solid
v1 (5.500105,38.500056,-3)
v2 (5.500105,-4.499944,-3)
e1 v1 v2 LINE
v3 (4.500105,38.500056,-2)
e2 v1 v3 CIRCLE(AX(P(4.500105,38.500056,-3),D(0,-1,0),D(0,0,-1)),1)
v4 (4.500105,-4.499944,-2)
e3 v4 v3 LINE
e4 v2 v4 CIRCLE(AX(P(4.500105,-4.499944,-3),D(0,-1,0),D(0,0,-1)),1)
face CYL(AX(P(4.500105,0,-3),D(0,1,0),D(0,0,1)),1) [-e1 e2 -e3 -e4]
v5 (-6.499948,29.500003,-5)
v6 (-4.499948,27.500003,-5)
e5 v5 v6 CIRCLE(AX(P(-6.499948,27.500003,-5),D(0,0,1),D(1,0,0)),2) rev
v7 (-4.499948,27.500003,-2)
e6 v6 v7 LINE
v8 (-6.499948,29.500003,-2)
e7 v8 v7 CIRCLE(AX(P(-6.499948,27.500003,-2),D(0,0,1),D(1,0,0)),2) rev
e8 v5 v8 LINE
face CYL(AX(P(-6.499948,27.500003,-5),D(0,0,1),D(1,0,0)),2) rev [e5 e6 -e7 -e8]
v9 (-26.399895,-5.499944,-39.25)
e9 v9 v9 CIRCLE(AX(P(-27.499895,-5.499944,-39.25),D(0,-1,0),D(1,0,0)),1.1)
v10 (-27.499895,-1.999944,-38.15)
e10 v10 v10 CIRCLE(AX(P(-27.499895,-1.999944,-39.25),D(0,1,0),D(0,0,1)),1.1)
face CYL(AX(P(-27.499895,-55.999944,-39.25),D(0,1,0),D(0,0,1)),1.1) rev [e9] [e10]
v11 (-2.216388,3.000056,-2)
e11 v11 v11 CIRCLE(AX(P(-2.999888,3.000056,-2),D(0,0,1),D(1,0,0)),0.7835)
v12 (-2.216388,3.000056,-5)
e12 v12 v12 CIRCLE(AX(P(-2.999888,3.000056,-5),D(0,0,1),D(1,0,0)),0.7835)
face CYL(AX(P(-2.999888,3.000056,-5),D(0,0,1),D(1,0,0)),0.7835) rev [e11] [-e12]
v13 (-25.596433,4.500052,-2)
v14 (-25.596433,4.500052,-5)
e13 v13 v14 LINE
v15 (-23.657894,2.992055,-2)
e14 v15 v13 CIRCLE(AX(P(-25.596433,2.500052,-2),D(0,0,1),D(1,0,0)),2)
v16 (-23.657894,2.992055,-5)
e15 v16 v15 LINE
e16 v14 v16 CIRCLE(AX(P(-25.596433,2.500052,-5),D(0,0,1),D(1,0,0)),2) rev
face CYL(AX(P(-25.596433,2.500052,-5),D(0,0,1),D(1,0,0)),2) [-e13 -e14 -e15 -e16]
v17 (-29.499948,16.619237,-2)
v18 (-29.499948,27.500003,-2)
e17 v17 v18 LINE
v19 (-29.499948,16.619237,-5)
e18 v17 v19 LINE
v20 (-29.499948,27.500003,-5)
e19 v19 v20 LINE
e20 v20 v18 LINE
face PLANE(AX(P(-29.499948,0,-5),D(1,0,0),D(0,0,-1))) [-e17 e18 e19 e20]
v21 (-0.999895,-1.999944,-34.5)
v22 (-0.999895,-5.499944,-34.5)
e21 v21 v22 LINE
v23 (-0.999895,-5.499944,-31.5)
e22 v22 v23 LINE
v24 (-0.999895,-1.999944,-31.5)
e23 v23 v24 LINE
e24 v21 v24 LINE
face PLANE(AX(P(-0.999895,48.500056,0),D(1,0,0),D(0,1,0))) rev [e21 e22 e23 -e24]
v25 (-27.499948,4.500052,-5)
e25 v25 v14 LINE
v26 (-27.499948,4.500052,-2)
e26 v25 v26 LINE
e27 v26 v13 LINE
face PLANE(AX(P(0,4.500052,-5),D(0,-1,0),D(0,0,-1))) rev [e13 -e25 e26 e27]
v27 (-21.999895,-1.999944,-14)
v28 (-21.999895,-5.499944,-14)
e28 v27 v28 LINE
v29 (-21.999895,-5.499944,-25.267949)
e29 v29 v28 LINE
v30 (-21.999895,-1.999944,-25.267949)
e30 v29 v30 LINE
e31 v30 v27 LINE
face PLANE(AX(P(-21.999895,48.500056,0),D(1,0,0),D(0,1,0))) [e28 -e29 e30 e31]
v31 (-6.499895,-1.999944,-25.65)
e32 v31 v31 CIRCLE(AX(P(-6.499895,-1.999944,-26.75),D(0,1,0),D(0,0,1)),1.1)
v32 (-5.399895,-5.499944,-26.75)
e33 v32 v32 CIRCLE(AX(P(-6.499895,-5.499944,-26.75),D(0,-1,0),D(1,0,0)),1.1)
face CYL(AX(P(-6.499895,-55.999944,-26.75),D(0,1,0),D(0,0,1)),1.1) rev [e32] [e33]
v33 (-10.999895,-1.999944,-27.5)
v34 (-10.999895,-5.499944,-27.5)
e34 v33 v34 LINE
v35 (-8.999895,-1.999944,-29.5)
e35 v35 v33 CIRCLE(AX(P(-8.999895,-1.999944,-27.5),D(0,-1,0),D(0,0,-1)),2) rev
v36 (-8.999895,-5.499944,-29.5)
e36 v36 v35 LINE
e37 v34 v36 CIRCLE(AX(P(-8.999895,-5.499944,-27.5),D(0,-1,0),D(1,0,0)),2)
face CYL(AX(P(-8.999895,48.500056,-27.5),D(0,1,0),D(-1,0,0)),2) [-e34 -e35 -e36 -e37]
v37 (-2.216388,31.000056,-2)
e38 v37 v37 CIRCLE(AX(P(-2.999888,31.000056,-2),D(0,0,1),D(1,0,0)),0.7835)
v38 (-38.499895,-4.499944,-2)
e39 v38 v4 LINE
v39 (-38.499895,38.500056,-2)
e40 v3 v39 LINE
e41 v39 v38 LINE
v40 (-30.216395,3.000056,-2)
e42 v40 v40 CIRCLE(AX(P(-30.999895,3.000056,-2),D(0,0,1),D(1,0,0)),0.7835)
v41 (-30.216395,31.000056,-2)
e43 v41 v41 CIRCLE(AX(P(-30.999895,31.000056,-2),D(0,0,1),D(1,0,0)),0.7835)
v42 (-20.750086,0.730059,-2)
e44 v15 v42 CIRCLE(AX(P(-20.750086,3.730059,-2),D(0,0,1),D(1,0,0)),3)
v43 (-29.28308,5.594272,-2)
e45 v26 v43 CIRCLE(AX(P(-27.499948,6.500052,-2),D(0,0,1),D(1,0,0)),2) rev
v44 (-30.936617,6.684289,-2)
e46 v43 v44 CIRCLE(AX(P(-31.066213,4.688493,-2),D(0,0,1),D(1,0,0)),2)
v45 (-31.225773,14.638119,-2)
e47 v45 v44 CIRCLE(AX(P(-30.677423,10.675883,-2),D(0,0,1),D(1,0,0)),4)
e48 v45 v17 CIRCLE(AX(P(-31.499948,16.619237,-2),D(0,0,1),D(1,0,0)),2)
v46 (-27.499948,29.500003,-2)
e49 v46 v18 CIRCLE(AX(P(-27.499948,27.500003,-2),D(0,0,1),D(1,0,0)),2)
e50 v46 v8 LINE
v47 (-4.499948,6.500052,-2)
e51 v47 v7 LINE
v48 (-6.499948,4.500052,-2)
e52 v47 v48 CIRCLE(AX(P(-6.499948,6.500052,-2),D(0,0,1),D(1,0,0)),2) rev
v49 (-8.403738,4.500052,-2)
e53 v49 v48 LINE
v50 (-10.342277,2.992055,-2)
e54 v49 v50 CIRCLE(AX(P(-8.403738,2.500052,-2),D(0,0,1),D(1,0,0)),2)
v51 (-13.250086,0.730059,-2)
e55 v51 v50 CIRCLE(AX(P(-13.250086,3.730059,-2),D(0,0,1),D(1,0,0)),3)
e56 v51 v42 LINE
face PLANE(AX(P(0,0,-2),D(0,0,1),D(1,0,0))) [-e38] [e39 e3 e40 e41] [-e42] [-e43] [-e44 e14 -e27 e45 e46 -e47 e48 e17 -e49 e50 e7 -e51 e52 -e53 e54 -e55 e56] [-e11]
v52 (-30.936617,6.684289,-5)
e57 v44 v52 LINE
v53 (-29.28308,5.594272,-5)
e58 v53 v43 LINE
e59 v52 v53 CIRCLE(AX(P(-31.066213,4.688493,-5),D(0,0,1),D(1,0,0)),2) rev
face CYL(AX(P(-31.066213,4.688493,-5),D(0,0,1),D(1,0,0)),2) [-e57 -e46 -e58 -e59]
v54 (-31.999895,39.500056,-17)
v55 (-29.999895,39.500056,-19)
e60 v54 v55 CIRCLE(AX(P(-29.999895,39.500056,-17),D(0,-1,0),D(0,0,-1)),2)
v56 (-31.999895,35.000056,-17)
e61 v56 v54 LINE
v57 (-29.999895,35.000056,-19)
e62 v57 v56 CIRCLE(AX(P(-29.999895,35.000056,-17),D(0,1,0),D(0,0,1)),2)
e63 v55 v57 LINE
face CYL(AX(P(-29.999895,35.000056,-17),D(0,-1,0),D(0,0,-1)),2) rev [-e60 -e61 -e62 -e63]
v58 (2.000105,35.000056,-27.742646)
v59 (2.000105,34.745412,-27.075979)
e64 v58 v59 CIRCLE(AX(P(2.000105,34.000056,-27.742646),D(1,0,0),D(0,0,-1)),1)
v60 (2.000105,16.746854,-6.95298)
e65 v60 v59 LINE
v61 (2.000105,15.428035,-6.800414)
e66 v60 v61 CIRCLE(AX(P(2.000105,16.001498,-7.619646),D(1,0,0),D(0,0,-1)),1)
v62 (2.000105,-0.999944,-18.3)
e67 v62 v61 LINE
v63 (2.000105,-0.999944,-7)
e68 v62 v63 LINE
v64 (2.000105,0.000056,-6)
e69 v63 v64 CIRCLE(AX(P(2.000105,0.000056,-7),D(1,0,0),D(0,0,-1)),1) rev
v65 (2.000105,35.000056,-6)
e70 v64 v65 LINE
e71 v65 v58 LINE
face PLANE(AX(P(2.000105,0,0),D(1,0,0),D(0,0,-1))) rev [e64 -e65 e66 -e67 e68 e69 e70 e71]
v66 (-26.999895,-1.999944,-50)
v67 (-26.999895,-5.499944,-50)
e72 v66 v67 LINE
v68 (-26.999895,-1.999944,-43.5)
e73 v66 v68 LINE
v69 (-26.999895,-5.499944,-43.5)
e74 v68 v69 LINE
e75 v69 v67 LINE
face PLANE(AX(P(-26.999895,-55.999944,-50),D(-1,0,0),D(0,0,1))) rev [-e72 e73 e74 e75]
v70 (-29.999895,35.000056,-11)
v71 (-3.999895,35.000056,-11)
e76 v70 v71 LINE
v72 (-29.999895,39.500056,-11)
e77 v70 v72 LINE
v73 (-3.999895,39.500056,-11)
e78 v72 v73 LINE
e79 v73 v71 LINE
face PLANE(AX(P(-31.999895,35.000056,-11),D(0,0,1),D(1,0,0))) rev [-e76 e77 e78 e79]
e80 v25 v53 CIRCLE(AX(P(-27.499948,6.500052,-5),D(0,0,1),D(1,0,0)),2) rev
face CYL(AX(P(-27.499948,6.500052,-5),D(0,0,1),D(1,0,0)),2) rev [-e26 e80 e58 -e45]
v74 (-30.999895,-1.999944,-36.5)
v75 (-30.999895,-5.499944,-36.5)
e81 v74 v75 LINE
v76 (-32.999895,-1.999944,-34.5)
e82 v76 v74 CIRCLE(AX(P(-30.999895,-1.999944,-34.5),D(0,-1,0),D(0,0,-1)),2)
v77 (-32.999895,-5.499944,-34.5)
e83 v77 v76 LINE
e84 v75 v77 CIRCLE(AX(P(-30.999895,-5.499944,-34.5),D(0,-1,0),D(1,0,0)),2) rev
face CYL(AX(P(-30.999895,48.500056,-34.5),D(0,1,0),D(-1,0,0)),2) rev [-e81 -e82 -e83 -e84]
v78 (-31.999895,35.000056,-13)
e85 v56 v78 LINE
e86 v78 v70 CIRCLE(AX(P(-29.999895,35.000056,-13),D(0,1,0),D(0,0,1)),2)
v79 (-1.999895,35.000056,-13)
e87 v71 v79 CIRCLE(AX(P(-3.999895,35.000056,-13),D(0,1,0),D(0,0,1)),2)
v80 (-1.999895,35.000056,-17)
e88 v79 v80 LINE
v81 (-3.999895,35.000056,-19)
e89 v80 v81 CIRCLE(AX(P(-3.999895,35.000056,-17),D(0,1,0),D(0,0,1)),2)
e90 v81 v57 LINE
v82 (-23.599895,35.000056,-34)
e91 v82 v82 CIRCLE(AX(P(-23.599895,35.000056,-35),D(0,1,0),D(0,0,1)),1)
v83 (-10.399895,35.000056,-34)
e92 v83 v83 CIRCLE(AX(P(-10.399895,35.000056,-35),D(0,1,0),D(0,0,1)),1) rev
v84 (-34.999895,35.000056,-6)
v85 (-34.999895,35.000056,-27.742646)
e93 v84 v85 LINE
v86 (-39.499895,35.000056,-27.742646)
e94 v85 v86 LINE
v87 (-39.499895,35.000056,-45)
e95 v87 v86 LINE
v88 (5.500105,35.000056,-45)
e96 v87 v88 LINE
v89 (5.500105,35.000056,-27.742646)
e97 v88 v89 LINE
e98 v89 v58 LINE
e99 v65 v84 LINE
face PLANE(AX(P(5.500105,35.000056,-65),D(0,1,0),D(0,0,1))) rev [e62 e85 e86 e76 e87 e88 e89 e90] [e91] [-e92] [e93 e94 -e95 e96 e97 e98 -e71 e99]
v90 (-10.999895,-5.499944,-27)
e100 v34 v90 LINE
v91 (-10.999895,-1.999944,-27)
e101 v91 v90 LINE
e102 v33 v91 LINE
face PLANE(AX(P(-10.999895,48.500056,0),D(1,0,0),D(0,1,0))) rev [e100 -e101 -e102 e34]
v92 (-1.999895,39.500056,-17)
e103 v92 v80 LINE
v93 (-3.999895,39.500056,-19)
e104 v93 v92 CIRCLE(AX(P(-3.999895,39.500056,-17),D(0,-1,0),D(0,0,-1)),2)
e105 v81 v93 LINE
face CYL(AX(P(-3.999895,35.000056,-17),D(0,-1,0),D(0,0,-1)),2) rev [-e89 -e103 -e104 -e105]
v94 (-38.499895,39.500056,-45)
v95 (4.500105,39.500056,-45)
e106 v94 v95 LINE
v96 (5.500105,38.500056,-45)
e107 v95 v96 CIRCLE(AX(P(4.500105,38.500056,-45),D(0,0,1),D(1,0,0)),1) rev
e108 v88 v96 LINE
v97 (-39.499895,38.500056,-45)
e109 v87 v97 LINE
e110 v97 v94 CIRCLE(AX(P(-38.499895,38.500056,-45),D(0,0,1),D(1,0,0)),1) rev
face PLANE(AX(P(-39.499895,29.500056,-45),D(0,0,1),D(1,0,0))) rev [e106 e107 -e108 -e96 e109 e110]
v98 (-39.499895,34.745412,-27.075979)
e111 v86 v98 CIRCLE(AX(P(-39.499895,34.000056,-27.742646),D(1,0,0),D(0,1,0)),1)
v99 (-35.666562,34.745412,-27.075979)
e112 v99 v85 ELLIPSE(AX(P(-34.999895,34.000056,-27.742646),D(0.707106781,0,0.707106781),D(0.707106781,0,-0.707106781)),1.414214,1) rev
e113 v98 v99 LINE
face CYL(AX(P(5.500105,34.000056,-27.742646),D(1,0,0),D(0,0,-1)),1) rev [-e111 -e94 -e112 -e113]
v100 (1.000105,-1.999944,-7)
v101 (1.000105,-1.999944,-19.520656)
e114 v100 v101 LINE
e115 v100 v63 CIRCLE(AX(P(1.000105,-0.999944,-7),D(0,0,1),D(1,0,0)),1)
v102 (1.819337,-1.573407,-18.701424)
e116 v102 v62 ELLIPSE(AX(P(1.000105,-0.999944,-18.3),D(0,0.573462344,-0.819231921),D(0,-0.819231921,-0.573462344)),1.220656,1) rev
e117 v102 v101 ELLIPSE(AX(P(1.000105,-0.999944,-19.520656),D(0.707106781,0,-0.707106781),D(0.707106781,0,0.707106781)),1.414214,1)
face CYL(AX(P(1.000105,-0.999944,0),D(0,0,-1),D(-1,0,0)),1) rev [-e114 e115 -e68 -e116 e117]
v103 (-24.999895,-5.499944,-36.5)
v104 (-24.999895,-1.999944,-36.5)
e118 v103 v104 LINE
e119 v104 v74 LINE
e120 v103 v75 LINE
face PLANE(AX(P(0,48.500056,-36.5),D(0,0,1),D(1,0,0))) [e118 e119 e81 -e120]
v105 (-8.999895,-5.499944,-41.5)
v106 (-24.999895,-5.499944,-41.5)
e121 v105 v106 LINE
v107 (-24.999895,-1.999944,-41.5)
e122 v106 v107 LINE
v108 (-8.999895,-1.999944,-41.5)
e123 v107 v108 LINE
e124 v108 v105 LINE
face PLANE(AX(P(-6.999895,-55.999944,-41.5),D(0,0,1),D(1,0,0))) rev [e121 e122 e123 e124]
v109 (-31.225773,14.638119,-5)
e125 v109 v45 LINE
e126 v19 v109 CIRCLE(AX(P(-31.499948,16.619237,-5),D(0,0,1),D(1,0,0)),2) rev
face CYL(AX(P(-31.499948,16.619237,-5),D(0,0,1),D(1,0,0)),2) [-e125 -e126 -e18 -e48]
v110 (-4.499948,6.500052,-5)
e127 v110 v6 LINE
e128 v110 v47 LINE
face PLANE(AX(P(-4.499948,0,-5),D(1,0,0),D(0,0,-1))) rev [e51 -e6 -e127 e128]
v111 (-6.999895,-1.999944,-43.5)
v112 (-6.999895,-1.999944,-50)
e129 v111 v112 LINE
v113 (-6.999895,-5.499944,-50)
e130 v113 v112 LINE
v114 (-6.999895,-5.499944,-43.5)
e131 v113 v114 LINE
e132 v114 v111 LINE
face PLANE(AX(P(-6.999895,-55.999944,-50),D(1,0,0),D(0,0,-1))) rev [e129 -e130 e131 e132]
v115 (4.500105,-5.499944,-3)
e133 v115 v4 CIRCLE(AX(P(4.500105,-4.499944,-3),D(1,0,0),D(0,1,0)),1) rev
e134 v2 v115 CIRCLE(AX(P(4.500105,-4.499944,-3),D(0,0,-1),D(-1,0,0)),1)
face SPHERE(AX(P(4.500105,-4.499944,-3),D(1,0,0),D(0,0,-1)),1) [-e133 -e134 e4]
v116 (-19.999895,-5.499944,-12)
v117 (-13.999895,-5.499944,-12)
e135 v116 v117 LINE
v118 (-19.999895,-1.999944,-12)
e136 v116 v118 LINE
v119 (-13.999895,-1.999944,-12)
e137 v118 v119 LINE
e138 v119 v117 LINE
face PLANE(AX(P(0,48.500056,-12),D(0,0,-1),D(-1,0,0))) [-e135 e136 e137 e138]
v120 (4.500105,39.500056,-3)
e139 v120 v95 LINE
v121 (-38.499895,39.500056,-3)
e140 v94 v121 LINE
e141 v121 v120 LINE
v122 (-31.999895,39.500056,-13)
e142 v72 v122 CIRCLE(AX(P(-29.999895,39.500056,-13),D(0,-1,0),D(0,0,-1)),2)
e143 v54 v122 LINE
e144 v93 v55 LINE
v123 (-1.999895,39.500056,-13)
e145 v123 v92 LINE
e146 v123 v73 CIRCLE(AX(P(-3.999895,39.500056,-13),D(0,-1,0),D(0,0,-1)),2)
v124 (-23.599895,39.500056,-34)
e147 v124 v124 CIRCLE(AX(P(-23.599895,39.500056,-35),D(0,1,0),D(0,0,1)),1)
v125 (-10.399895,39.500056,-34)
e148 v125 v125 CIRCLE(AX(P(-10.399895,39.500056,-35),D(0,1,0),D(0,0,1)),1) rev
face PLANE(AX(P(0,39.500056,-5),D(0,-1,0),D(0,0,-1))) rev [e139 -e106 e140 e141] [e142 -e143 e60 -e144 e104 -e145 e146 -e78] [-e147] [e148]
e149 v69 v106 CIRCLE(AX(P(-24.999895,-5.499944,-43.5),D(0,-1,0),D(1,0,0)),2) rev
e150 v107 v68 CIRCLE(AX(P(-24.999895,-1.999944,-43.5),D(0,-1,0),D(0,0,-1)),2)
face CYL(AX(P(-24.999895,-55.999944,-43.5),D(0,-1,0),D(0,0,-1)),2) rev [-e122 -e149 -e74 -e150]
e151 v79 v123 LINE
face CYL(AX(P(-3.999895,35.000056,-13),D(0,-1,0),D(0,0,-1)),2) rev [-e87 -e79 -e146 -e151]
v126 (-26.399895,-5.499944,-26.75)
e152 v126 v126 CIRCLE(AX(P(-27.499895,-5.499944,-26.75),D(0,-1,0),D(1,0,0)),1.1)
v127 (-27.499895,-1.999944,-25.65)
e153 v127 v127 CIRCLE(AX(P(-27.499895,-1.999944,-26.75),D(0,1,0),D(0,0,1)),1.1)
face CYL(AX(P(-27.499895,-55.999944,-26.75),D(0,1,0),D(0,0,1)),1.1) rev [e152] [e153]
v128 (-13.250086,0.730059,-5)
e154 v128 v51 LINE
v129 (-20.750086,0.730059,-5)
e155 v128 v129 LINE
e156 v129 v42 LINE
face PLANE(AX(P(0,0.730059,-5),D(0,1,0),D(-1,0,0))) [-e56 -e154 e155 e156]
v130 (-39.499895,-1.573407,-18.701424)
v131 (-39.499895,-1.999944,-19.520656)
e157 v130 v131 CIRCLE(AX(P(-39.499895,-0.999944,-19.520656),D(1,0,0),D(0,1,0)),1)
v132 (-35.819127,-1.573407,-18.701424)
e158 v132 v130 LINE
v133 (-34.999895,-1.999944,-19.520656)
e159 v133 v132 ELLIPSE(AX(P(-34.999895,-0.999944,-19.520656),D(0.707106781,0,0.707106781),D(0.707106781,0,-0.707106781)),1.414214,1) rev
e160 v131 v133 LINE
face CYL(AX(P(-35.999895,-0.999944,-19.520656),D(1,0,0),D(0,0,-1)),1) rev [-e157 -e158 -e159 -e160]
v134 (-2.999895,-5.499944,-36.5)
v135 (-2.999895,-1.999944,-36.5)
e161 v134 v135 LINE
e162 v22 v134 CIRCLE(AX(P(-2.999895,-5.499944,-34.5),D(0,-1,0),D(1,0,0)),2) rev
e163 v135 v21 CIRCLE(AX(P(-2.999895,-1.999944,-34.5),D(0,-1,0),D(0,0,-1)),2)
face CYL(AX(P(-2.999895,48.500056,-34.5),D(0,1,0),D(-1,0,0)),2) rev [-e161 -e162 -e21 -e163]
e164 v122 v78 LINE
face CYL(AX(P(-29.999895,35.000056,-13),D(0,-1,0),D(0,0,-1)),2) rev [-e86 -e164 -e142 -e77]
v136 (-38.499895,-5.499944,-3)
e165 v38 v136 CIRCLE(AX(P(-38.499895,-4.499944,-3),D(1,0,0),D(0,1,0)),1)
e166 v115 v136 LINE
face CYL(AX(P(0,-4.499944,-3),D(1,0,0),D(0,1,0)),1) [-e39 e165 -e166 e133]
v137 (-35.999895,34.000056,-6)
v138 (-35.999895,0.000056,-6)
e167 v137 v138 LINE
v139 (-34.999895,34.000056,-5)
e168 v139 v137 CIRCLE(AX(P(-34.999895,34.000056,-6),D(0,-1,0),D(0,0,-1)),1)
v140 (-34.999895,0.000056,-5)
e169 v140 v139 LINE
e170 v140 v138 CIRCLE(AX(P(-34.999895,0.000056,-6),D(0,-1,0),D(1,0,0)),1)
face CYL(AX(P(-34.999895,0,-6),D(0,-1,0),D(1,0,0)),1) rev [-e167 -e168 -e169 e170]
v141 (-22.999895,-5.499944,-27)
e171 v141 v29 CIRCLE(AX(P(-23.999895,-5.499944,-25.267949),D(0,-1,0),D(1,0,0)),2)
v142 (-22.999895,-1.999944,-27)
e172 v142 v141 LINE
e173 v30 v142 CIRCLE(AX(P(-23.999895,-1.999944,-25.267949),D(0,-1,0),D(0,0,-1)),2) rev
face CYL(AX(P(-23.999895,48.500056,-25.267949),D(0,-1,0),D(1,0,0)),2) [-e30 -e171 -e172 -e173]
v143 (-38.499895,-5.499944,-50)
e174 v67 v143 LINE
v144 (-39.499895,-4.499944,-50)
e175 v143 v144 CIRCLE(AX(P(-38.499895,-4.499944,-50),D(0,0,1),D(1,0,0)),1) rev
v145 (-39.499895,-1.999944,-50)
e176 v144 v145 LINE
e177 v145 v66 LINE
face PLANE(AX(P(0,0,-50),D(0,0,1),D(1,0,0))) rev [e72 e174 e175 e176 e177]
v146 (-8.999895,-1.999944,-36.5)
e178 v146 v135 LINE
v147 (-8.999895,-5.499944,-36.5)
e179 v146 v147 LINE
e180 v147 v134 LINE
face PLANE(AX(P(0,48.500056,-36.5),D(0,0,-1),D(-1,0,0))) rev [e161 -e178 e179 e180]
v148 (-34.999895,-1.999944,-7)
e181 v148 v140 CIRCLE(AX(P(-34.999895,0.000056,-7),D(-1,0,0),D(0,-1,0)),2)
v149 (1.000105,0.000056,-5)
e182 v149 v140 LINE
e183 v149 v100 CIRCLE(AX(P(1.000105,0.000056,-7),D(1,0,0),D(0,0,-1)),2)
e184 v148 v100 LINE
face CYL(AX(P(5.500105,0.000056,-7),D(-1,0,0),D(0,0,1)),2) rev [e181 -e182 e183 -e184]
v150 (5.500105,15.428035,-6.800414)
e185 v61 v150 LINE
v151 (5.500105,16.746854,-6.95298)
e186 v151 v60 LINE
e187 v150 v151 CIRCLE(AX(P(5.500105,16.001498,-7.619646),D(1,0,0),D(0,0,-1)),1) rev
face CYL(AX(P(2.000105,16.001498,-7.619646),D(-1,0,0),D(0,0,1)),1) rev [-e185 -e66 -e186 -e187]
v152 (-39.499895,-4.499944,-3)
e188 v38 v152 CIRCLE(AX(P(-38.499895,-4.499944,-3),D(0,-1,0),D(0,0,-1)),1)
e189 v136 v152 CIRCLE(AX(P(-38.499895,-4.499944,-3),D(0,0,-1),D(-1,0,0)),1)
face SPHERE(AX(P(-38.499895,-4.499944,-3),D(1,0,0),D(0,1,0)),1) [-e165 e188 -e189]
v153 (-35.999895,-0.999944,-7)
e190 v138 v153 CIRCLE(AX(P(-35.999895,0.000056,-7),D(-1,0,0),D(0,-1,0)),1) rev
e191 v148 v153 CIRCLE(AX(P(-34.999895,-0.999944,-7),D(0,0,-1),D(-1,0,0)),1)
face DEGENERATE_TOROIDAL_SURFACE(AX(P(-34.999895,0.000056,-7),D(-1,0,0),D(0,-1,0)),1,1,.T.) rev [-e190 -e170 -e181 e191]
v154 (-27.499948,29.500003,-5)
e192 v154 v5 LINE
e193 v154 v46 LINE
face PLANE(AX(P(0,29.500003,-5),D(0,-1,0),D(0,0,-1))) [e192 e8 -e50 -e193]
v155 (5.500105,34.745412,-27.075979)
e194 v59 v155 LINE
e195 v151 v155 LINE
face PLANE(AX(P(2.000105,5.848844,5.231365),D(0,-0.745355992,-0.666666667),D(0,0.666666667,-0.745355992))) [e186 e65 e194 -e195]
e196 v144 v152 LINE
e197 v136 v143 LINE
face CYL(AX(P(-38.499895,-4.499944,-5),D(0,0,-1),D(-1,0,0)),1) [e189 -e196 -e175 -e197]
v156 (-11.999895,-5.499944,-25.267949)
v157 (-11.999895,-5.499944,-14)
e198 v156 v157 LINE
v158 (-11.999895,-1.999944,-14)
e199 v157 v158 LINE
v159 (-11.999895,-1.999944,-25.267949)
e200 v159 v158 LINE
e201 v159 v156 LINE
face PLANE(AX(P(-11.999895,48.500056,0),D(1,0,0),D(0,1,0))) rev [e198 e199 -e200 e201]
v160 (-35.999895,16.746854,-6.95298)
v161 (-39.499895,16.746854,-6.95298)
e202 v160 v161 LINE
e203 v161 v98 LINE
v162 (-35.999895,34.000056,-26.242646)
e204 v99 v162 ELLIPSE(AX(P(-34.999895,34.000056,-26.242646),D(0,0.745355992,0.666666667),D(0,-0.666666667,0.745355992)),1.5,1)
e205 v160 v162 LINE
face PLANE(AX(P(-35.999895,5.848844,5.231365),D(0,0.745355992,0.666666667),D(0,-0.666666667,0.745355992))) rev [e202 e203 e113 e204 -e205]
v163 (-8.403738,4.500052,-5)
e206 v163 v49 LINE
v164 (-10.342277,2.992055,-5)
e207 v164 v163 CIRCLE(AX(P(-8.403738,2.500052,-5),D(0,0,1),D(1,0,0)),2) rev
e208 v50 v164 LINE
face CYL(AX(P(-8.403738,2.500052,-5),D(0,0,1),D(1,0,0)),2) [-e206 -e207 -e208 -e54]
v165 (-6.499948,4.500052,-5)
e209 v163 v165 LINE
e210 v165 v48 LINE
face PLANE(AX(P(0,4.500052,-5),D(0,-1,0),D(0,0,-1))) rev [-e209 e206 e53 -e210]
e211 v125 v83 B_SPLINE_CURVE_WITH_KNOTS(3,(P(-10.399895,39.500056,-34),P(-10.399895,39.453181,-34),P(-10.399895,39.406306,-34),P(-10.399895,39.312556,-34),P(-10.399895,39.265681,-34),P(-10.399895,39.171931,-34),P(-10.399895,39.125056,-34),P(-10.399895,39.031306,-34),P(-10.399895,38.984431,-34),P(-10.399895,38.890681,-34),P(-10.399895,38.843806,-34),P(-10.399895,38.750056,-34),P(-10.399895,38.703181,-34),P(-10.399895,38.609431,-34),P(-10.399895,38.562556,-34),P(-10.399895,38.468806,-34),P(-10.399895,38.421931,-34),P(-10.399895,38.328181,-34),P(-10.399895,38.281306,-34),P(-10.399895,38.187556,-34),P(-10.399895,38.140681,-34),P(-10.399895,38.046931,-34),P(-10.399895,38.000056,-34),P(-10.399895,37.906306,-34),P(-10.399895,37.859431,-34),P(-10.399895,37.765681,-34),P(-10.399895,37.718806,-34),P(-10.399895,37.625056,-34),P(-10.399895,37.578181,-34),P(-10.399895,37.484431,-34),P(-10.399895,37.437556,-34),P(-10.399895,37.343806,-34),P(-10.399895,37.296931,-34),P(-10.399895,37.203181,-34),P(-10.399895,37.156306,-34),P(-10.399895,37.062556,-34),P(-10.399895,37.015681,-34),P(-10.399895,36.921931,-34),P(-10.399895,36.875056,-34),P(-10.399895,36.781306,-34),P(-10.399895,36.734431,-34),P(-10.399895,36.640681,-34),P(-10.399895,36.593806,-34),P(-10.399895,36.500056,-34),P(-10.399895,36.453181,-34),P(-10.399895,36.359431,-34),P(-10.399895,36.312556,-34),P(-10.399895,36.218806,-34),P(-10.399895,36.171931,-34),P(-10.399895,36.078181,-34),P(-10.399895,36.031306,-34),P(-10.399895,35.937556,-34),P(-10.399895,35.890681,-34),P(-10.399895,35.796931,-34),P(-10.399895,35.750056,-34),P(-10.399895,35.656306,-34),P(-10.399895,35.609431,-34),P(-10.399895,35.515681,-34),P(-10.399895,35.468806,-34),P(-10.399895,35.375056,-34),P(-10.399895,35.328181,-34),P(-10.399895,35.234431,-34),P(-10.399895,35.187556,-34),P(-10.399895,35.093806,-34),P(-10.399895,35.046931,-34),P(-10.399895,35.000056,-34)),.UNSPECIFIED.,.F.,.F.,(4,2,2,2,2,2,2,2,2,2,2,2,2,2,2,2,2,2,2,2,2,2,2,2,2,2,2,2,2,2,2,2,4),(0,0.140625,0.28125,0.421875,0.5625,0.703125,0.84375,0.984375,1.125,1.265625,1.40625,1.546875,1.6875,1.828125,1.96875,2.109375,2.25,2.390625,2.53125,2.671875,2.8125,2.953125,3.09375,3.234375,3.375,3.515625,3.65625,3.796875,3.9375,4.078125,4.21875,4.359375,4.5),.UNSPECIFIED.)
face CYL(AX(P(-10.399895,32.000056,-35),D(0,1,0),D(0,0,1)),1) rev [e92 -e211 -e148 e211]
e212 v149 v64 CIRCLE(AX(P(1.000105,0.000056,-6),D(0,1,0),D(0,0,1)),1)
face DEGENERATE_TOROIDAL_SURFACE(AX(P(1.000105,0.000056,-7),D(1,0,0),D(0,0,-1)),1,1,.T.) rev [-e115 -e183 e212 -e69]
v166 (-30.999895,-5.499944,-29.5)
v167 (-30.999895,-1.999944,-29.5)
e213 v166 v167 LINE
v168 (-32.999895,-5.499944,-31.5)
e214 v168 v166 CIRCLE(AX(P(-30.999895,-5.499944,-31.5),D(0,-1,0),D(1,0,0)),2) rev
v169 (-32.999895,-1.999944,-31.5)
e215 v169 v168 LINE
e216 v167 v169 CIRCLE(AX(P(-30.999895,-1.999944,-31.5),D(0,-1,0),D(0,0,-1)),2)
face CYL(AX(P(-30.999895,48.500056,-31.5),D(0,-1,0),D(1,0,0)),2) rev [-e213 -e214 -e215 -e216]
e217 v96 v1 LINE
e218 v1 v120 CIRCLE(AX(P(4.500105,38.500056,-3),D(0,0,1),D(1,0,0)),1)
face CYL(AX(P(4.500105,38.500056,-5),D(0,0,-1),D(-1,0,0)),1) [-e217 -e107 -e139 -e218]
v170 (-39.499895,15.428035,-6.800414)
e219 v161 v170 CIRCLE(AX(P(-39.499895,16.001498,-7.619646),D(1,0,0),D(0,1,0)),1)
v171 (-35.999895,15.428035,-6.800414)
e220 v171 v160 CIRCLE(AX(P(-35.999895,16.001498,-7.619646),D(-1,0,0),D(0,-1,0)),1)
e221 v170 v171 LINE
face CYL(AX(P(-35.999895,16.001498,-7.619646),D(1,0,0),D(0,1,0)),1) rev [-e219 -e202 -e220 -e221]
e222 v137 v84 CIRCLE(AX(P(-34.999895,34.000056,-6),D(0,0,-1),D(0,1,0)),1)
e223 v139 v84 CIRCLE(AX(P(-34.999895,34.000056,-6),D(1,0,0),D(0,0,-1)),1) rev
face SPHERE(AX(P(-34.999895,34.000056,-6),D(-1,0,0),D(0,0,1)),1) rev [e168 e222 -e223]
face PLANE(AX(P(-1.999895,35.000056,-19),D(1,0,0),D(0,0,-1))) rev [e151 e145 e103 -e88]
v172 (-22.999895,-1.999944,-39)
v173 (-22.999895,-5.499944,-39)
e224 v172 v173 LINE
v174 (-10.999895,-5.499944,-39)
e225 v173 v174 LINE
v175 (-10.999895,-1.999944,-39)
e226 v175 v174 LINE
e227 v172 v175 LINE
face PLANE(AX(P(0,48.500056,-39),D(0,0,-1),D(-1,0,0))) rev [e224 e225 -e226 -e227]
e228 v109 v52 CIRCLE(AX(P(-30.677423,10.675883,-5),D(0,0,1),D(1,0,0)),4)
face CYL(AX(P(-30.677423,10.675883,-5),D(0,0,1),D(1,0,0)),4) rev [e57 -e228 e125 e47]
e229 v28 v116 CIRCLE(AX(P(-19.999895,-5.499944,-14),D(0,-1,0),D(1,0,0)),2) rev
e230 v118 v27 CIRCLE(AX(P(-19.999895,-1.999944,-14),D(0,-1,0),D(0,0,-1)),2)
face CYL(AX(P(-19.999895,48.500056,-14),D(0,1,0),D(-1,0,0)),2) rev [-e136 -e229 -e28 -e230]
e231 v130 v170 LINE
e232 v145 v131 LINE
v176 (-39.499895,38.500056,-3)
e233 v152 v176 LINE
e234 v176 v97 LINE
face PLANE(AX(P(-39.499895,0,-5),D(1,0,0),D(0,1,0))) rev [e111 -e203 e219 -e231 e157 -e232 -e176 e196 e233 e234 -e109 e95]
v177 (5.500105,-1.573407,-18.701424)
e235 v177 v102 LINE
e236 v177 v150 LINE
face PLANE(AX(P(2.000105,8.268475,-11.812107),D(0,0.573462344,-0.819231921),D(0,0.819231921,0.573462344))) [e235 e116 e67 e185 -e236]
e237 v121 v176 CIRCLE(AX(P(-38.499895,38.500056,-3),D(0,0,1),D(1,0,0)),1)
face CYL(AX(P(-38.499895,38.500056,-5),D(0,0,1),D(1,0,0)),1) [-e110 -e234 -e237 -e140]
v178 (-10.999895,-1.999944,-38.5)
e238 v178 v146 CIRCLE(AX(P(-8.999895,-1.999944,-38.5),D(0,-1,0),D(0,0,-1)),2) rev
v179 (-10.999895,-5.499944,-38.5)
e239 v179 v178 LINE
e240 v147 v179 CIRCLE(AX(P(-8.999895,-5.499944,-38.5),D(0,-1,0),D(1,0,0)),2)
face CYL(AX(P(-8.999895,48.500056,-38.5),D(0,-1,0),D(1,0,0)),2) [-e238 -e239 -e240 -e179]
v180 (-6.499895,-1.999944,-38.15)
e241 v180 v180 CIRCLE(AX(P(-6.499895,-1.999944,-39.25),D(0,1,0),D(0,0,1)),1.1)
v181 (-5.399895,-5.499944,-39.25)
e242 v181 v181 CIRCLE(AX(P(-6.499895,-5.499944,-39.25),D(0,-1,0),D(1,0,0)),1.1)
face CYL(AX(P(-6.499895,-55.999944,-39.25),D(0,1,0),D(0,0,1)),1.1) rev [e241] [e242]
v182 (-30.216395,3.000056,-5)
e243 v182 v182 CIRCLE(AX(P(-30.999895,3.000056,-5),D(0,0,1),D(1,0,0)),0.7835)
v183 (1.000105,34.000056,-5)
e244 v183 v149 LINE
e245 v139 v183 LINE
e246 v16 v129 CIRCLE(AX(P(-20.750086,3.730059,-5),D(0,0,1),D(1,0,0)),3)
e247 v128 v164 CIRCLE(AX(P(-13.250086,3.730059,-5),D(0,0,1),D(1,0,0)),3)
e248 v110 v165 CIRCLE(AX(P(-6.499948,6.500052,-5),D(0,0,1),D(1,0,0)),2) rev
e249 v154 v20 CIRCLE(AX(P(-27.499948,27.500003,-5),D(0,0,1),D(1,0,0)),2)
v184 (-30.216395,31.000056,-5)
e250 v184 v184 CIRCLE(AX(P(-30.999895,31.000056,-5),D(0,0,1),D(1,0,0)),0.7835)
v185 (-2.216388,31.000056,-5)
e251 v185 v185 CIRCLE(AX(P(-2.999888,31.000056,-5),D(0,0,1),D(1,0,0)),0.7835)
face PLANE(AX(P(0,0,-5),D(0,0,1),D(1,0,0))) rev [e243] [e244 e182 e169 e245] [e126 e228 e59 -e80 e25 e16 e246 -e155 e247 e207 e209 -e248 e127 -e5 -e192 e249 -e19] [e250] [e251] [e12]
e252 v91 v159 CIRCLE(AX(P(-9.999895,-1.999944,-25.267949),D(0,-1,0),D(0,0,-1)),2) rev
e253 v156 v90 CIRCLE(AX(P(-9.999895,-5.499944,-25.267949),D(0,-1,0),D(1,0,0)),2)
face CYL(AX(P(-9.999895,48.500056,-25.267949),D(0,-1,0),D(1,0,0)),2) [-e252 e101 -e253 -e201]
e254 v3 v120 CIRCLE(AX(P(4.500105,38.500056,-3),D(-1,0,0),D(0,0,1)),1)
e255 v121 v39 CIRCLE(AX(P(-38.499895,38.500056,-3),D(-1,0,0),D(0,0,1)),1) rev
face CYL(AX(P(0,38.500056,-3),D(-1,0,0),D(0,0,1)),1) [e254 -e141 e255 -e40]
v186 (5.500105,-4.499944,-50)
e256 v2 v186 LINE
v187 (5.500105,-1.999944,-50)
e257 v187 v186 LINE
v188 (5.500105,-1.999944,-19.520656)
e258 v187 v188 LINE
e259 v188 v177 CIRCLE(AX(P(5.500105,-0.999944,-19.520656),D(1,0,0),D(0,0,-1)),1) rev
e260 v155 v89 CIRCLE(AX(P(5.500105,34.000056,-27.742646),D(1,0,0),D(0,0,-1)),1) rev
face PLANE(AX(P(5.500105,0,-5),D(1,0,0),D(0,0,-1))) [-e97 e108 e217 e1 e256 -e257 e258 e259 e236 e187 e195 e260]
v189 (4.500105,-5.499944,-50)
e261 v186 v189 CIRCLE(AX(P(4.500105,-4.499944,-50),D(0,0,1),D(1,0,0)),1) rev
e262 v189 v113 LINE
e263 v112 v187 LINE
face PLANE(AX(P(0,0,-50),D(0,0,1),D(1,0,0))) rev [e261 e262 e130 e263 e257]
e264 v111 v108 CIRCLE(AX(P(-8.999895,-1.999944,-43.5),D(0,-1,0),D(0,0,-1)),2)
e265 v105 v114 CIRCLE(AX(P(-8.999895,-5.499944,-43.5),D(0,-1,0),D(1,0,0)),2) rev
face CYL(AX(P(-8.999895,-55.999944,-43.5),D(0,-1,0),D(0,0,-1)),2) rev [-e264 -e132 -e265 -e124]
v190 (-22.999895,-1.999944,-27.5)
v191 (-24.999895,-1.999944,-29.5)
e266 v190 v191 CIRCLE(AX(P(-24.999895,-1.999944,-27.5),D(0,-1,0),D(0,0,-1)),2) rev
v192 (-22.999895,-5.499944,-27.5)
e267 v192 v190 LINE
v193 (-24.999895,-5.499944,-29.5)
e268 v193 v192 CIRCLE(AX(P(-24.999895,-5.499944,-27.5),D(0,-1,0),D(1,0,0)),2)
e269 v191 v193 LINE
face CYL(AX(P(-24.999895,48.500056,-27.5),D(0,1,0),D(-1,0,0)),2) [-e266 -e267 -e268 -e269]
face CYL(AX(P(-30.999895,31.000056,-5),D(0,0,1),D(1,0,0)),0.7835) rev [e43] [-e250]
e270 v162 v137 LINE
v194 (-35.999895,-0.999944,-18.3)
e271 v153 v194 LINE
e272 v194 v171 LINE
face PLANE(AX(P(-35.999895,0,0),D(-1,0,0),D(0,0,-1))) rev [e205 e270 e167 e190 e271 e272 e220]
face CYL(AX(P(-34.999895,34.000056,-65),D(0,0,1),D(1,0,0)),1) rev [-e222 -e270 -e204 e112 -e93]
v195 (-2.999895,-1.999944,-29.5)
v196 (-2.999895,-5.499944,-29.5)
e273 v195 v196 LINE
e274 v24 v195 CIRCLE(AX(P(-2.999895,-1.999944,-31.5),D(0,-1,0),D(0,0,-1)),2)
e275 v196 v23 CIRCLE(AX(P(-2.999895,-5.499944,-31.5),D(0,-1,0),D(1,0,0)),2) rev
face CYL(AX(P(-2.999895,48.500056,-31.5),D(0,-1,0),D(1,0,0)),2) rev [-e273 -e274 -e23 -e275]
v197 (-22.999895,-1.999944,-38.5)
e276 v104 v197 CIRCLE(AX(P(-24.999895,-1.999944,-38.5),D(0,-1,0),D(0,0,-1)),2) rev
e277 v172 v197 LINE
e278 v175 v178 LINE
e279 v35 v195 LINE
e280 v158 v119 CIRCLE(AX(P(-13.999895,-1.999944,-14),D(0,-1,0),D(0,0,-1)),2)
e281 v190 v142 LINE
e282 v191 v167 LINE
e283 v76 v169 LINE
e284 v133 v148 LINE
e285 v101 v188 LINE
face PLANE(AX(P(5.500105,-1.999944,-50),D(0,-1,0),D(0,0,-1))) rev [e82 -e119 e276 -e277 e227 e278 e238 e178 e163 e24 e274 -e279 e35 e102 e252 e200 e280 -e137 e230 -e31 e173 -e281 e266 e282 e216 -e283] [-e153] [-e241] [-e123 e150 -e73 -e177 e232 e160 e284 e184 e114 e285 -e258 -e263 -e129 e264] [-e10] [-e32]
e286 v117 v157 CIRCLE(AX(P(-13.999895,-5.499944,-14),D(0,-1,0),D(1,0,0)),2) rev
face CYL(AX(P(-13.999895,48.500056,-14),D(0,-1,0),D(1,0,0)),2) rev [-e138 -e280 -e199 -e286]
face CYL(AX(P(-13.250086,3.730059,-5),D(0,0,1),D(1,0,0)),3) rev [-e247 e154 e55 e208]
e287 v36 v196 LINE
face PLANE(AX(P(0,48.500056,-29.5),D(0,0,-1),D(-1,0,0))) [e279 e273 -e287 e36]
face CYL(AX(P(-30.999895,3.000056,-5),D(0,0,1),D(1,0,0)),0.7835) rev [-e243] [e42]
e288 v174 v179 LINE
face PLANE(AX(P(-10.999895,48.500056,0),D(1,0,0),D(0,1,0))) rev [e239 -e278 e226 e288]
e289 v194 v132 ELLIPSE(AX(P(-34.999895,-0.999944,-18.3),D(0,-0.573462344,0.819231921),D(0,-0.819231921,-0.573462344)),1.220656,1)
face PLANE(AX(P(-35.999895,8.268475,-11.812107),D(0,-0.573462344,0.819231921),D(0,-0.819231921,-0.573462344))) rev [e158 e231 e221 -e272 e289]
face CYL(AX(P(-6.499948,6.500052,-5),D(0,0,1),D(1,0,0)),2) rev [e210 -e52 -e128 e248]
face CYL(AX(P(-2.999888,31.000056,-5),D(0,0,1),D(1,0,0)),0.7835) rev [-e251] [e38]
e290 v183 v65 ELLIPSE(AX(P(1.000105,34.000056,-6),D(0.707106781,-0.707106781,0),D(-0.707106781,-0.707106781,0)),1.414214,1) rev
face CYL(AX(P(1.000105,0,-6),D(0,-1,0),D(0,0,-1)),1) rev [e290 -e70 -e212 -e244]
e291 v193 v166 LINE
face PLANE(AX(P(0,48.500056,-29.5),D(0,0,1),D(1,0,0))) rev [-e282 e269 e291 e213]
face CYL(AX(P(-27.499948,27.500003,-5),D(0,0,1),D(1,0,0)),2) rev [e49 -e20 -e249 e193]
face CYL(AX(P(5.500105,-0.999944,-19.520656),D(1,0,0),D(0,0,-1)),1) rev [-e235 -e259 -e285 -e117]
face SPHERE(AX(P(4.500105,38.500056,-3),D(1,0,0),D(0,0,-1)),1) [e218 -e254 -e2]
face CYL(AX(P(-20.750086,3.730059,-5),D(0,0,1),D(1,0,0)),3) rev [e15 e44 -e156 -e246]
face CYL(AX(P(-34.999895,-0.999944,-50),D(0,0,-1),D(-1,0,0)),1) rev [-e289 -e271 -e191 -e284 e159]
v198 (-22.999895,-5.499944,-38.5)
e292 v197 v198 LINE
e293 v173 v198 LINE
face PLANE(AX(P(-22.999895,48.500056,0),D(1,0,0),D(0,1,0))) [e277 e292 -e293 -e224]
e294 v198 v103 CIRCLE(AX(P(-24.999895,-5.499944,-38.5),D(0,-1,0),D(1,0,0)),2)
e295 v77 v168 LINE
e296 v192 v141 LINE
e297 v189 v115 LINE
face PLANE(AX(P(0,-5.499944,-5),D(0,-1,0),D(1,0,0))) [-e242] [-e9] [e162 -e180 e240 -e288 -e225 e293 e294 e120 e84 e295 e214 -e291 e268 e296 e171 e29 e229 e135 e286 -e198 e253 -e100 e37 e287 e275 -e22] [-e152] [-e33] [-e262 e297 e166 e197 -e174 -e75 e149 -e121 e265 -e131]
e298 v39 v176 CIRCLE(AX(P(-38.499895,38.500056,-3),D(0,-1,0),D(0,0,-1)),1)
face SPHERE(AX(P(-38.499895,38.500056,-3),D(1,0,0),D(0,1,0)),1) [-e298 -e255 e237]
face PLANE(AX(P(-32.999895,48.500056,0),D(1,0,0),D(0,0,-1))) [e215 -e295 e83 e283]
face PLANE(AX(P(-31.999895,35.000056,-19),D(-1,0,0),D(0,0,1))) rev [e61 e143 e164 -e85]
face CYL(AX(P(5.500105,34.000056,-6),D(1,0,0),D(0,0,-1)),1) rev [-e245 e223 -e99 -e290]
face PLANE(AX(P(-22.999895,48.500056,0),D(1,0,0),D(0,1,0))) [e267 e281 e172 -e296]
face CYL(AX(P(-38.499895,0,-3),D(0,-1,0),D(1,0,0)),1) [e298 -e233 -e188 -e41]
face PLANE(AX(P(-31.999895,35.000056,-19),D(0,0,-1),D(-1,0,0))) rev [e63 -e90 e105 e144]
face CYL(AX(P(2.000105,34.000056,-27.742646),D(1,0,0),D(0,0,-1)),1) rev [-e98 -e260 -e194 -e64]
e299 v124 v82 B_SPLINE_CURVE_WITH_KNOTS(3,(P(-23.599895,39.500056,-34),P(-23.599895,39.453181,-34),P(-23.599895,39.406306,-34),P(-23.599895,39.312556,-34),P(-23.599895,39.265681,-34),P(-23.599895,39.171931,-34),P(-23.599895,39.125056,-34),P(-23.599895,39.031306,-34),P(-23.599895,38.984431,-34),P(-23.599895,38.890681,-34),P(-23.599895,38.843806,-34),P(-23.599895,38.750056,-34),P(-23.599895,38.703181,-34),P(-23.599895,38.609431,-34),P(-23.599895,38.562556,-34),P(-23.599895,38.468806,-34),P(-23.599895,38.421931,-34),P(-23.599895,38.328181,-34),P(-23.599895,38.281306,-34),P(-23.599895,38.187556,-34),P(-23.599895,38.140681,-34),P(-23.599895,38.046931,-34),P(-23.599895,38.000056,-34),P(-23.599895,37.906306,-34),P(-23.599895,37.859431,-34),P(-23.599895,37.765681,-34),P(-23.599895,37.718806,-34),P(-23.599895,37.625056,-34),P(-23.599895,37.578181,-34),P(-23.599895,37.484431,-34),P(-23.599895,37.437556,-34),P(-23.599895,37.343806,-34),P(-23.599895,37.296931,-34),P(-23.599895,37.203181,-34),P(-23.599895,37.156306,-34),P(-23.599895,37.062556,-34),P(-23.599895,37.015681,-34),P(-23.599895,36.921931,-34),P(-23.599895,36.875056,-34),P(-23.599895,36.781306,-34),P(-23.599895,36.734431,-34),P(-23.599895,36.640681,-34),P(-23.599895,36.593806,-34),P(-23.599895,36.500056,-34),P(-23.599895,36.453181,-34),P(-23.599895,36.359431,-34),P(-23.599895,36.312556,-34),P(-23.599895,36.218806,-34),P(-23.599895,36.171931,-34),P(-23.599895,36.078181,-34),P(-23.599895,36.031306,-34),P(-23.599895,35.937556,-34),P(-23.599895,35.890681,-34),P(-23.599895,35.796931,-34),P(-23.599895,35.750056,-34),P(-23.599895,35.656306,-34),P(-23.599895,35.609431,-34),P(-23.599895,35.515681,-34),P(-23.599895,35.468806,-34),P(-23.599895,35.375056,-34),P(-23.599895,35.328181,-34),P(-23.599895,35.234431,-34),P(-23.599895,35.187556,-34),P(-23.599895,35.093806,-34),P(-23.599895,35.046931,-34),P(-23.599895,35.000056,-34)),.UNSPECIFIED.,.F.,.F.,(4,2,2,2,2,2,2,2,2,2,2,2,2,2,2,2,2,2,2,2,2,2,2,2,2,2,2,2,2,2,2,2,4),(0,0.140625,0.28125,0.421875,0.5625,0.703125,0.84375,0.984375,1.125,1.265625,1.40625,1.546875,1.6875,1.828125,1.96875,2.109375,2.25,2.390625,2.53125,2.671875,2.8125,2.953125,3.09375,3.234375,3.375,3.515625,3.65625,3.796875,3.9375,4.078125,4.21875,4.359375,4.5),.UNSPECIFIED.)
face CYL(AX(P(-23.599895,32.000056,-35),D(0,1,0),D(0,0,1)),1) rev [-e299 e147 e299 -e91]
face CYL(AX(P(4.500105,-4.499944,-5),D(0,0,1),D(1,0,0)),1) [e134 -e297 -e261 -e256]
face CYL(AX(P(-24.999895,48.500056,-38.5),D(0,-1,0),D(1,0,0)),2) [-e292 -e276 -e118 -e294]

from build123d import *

# Parameters (mm, degrees)
BOSS_EXTRUDE1_START     = -5
BOSS_EXTRUDE1_OUTLINE_W = 45
BOSS_EXTRUDE1_OUTLINE_H = 45
BOSS_EXTRUDE1_OUTLINE_R = 0.7835
BOSS_EXTRUDE1_DEPTH     = 3
FILLET1_R               = 2
SKETCH2_W               = 45
SKETCH2_H               = 3.5
BOSS_EXTRUDE2_DEPTH     = 45
SKETCH3_R               = 1.1
CUT_EXTRUDE1_DEPTH      = 54
SKETCH4_W               = 20
SKETCH4_H               = 8.5
CUT_EXTRUDE2_DEPTH      = 54
FILLET2_R               = 2
SKETCH5_W               = 4.5
SKETCH5_H               = 7
SKETCH5_W_2             = 5.5
SKETCH5_W_3             = 10
SKETCH5_H_2             = 15
CUT_EXTRUDE3_DEPTH      = 54
FILLET3_R               = 2
FILLET4_R               = 2
SKETCH6_W               = 45
SKETCH6_H               = 4.5
BOSS_EXTRUDE3_DEPTH     = 60
FILLET5_R               = 1
FILLET6_R               = 1
BOSS_EXTRUDE4_DEPTH     = 3.5
FILLET7_R               = 1
SKETCH8_R               = 1
CUT_EXTRUDE4_DEPTH      = 7.5
FILLET8_R               = 1
SKETCH9_W               = 45
SKETCH9_H               = 20
CUT_EXTRUDE5_DEPTH      = 10
SKETCH11_W              = 30
SKETCH11_H              = 8
CUT_EXTRUDE6_DEPTH      = 4.5
FILLET12_R              = 2


with BuildPart() as part:
    # Boss-Extrude1: read off the stored shape, not the designer's step
    # Boss-Extrude1 outline → Boss-Extrude1 (new body)
    with BuildSketch(Plane.XY.offset(BOSS_EXTRUDE1_START)):
        with Locations((-16.999895153, 17.00005562)):
            Rectangle(BOSS_EXTRUDE1_OUTLINE_W, BOSS_EXTRUDE1_OUTLINE_H)
        with Locations((-30.999895153, 3.00005562)):
            Circle(BOSS_EXTRUDE1_OUTLINE_R, mode=Mode.SUBTRACT)
        with BuildLine():
            ThreePointArc((-29.499947577, 6.853115409), (-34.677423456, 10.675882804), (-29.499947577, 14.498650198))
            Line((-29.499947577, 14.498650198), (-29.499947577, 27.500003196))
            ThreePointArc((-29.499947577, 27.500003196), (-28.914161139, 28.914216759), (-27.499947577, 29.500003196))
            Line((-27.499947577, 29.500003196), (-6.499947577, 29.500003196))
            ThreePointArc((-6.499947577, 29.500003196), (-5.085734014, 28.914216759), (-4.499947577, 27.500003196))
            Line((-4.499947577, 27.500003196), (-4.499947577, 6.500052423))
            ThreePointArc((-4.499947577, 6.500052423), (-5.085734015, 5.08583886), (-6.499947577, 4.500052423))
            Line((-6.499947577, 4.500052423), (-10.35058429, 4.500052423))
            ThreePointArc((-10.35058429, 4.500052423), (-10.872063447, 1.901121953), (-13.250085888, 0.730058603))
            Line((-13.250085888, 0.730058603), (-20.750085888, 0.730058603))
            ThreePointArc((-20.750085888, 0.730058603), (-23.128108329, 1.901121953), (-23.649587486, 4.500052423))
            Line((-23.649587486, 4.500052423), (-27.499947577, 4.500052423))
            ThreePointArc((-27.499947577, 4.500052423), (-28.914161139, 5.085838861), (-29.499947577, 6.500052423))
            Line((-29.499947577, 6.500052423), (-29.499947577, 6.853115409))
        make_face(mode=Mode.SUBTRACT)
        with Locations((-2.999887524, 3.00005562)):
            Circle(BOSS_EXTRUDE1_OUTLINE_R, mode=Mode.SUBTRACT)
        with Locations((-30.999895153, 31.00005562)):
            Circle(BOSS_EXTRUDE1_OUTLINE_R, mode=Mode.SUBTRACT)
        with Locations((-2.999887524, 31.00005562)):
            Circle(BOSS_EXTRUDE1_OUTLINE_R, mode=Mode.SUBTRACT)
    extrude(amount=BOSS_EXTRUDE1_DEPTH)

    # Fillet1
    fillet1_edges = [part.edges().sort_by_distance(p)[0] for p in [
        (-10.35058429, 4.500052423, -3.5),
        (-29.499947577, 14.498650198, -3.5),
        (-29.499947577, 6.853115409, -3.5),
        (-23.649587486, 4.500052423, -3.5),
    ]]
    fillet(fillet1_edges, radius=FILLET1_R)

    # Sketch2 → Boss-Extrude2 (add)
    with BuildSketch(Plane(origin=(0, 0, -5), x_dir=(-1, 0, 0), z_dir=(0, 0, -1))):
        with Locations((16.999895153, -3.74994438)):
            Rectangle(SKETCH2_W, SKETCH2_H)
    extrude(amount=BOSS_EXTRUDE2_DEPTH)

    # Sketch3 → Cut-Extrude1 (cut)
    with BuildSketch(Plane(origin=(0, -1.99994438, 0), x_dir=(1, 0, 0), z_dir=(0, 1, 0))):
        with BuildLine():
            Line((-27.499895153, 27.85), (-27.499895153, 26.75))
            Line((-27.499895153, 26.75), (-26.399895153, 26.75))
            ThreePointArc((-26.399895153, 26.75), (-26.722077694, 27.527817459), (-27.499895153, 27.85))
        make_face()
        with BuildLine():
            Line((-26.399895153, 26.75), (-27.499895153, 26.75))
            Line((-27.499895153, 26.75), (-27.499895153, 27.85))
            ThreePointArc((-27.499895153, 27.85), (-28.277712612, 25.972182541), (-26.399895153, 26.75))
        make_face()
        with BuildLine():
            ThreePointArc((-7.599895153, 39.25), (-7.277712612, 38.472182541), (-6.499895153, 38.15))
            Line((-6.499895153, 38.15), (-6.499895153, 39.25))
            Line((-6.499895153, 39.25), (-7.599895153, 39.25))
        make_face()
        with BuildLine():
            Line((-6.499895153, 39.25), (-6.499895153, 38.15))
            ThreePointArc((-6.499895153, 38.15), (-5.722077694, 38.472182541), (-5.399895153, 39.25))
            ThreePointArc((-5.399895153, 39.25), (-6.499895153, 40.35), (-7.599895153, 39.25))
            Line((-7.599895153, 39.25), (-6.499895153, 39.25))
        make_face()
        with BuildLine():
            ThreePointArc((-26.399895153, 39.25), (-28.277712612, 40.027817459), (-27.499895153, 38.15))
            Line((-27.499895153, 38.15), (-27.499895153, 39.25))
            Line((-27.499895153, 39.25), (-26.399895153, 39.25))
        make_face()
        with BuildLine():
            Line((-27.499895153, 39.25), (-27.499895153, 38.15))
            ThreePointArc((-27.499895153, 38.15), (-26.722077694, 38.472182541), (-26.399895153, 39.25))
            Line((-26.399895153, 39.25), (-27.499895153, 39.25))
        make_face()
        with Locations(Location((-6.499895153, 26.75, 0), (0, 0, 270))):
            Circle(SKETCH3_R)
    extrude(amount=-CUT_EXTRUDE1_DEPTH, mode=Mode.SUBTRACT)

    # Sketch4 → Cut-Extrude2 (cut)
    with BuildSketch(Plane(origin=(0, -1.99994438, 0), x_dir=(1, 0, 0), z_dir=(0, 1, 0))):
        with Locations((-16.999895153, 45.75)):
            Rectangle(SKETCH4_W, SKETCH4_H)
    extrude(amount=-CUT_EXTRUDE2_DEPTH, mode=Mode.SUBTRACT)

    # Fillet2
    fillet2_edges = [part.edges().sort_by_distance(p)[0] for p in [
        (-6.999895153, -3.74994438, -41.5),
        (-26.999895153, -3.74994438, -41.5),
    ]]
    fillet(fillet2_edges, radius=FILLET2_R)

    # Sketch5 → Cut-Extrude3 (cut)
    with BuildSketch(Plane.XZ.offset(5.49994438)):
        Polygon((-22.999895153, -36.5), (-22.999895153, -36.571428571), (-16.999895153, -33), (-22.999895153, -29.428571429), (-22.999895153, -29.5), align=None)
        Polygon((-22.999895153, -29.428571429), (-16.999895153, -33), (-10.999895153, -29.428571429), (-10.999895153, -27), (-11.999895153, -27), (-21.999895153, -27), (-22.999895153, -27), align=None)
        Polygon((-10.999895153, -29.428571429), (-16.999895153, -33), (-10.999895153, -36.571428571), (-10.999895153, -36.5), (-10.999895153, -29.5), align=None)
        Polygon((-16.999895153, -33), (-22.999895153, -36.571428571), (-22.999895153, -39), (-10.999895153, -39), (-10.999895153, -36.571428571), align=None)
        with Locations((-25.249895153, -33)):
            Rectangle(SKETCH5_W, SKETCH5_H)
        with Locations((-30.249895153, -33)):
            Rectangle(SKETCH5_W_2, SKETCH5_H)
        with Locations((-16.999895153, -19.5)):
            Rectangle(SKETCH5_W_3, SKETCH5_H_2)
        with Locations((-3.749895153, -33)):
            Rectangle(SKETCH5_W_2, SKETCH5_H)
        with Locations((-8.749895153, -33)):
            Rectangle(SKETCH5_W, SKETCH5_H)
    extrude(amount=-CUT_EXTRUDE3_DEPTH, mode=Mode.SUBTRACT)

    # Fillet3
    # the kernel refuses this fillet: 2 mm, written as the material it adds along each edge
    with BuildSketch(Plane(origin=(-32.999895153, -5.49994438, -36.5), x_dir=(0, 0, 1), z_dir=(0, 1, 0)), Plane(origin=(-32.999895153, -5.49994438, -29.5), x_dir=(1, 0, 0), z_dir=(0, 1, 0)), Plane(origin=(-0.999895153, -5.49994438, -36.5), x_dir=(-1, 0, 0), z_dir=(0, 1, 0)), Plane(origin=(-0.999895153, -5.49994438, -29.5), x_dir=(0, 0, -1), z_dir=(0, 1, 0)), Plane(origin=(-21.999895153, -5.49994438, -12), x_dir=(1, 0, 0), z_dir=(0, 1, 0)), Plane(origin=(-11.999895153, -5.49994438, -12), x_dir=(0, 0, -1), z_dir=(0, 1, 0))) as fillet3_piece_1:
        with BuildLine():
            CenterArc((FILLET3_R, FILLET3_R), FILLET3_R, 180, 90)
            Line((0, FILLET3_R), (0, 0))
            Line((0, 0), (FILLET3_R, 0))
        make_face()
    extrude(amount=3.5)
    # the kernel refuses this fillet: 2 mm, written as the material it takes off along each edge
    with BuildSketch(Plane(origin=(-22.999895153, -10.49994438, -36.5), x_dir=(-1, 0, 0), z_dir=(0, 1, 0)), Plane(origin=(-10.999895153, -10.49994438, -36.5), x_dir=(0, 0, -1), z_dir=(0, 1, 0)), Plane(origin=(-10.999895153, -10.49994438, -29.5), x_dir=(1, 0, 0), z_dir=(0, 1, 0))) as fillet3_2_piece_1:
        with BuildLine():
            CenterArc((FILLET3_R, -FILLET3_R), FILLET3_R, 90, 90)
            Line((0, -FILLET3_R), (0, 0))
            Line((0, 0), (FILLET3_R, 0))
        make_face()
    extrude(amount=13.5, mode=Mode.SUBTRACT)
    with BuildSketch(Plane(origin=(-11.999895153, -9.830071399, -27), x_dir=(1, 0, 0), z_dir=(0, 1, 0))) as fillet3_2_piece_2:
        with BuildLine():
            CenterArc((2, -1.732050808), FILLET3_R, 120, 60)
            Line((0, -1.732050808), (0, 0))
            Line((0, 0), (1, 0))
        make_face()
    extrude(amount=12.160254038, mode=Mode.SUBTRACT)
    with BuildSketch(Plane(origin=(-22.999895153, -10.49994438, -29.5), x_dir=(-1, 0, 0), z_dir=(0, 1, 0))) as fillet3_2_piece_3:
        with BuildLine():
            CenterArc((FILLET3_R, FILLET3_R), FILLET3_R, 180, 90)
            Line((0, FILLET3_R), (0, 0))
            Line((0, 0), (FILLET3_R, 0))
        make_face()
    extrude(amount=13.5, mode=Mode.SUBTRACT)
    with BuildSketch(Plane(origin=(-21.999895153, -9.830071399, -27), x_dir=(0, 0, 1), z_dir=(0, 1, 0))) as fillet3_2_piece_4:
        with BuildLine():
            CenterArc((1.732050808, -2), FILLET3_R, 90, 60)
            Line((0, -1), (0, 0))
            Line((0, 0), (1.732050808, 0))
        make_face()
    extrude(amount=12.160254038, mode=Mode.SUBTRACT)

    # Fillet4
    fillet4_edges = [part.edges().sort_by_distance(p)[0] for p in [
        (-16.999895153, -1.99994438, -5),
    ]]
    fillet(fillet4_edges, radius=FILLET4_R)

    # Sketch6 → Boss-Extrude3 (add)
    with BuildSketch(Plane(origin=(0, 0, -5), x_dir=(-1, 0, 0), z_dir=(0, 0, -1))):
        with Locations((16.999895153, 37.25005562)):
            Rectangle(SKETCH6_W, SKETCH6_H)
    extrude(amount=BOSS_EXTRUDE3_DEPTH)

    # Fillet5
    fillet5_edges = [part.edges().sort_by_distance(p)[0] for p in [
        (-16.999895153, -5.49994438, -2),
    ]]
    fillet(fillet5_edges, radius=FILLET5_R)

    # Fillet6
    fillet6_edges = [part.edges().sort_by_distance(p)[0] for p in [
        (-16.999895153, 39.50005562, -2),
    ]]
    fillet(fillet6_edges, radius=FILLET6_R)

    # Sketch7 → Boss-Extrude4 (add)
    with BuildSketch(Plane(origin=(5.500104847, 0, 0), x_dir=(0, 0, -1), z_dir=(1, 0, 0))):
        Polygon((5, 18.00005562), (6.291434259, 16.155149536), (27.360679775, 35.00005562), (5, 35.00005562), align=None)
        Polygon((5, 15.00005562), (6.291434259, 16.155149536), (5, 18.00005562), align=None)
        with BuildLine():
            Line((7, -1.99994438), (19, -1.99994438))
            Line((19, -1.99994438), (6.291434259, 16.155149536))
            Line((6.291434259, 16.155149536), (5, 15.00005562))
            Line((5, 15.00005562), (5, 5.562e-05))
            ThreePointArc((5, 5.562e-05), (5.585786438, -1.414157943), (7, -1.99994438))
        make_face()
    boss_extrude4 = extrude(amount=-BOSS_EXTRUDE4_DEPTH)

    # Mirror1: Boss-Extrude4 across plane
    add(boss_extrude4.mirror(Plane(origin=(-16.999895153, 0, 0), x_dir=(0, 0, 1), z_dir=(1, 0, 0))))

    # Fillet7
    fillet7_edges = [part.edges().sort_by_distance(p)[0] for p in [
        (-16.999895153, 35.00005562, -5),
        (3.750104847, 35.00005562, -27.360679775),
        (3.750104847, 16.155149536, -6.291434259),
        (3.750104847, -1.99994438, -19),
        (2.000104847, 17.50005562, -5),
        (2.000104847, -1.99994438, -13),
        (2.000104847, -1.414157943, -5.585786438),
        (-35.999895153, 17.50005562, -5),
        (-35.999895153, -1.414157943, -5.585786438),
        (-35.999895153, -1.99994438, -13),
        (-37.749895153, -1.99994438, -19),
        (-37.749895153, 16.155149536, -6.291434259),
        (-35.999895153, 35.00005562, -16.180339887),
        (-37.749895153, 35.00005562, -27.360679775),
    ]]
    fillet(fillet7_edges, radius=FILLET7_R)

    # Sketch8 → Cut-Extrude4 (cut)
    with BuildSketch(Plane(origin=(0, 39.50005562, 0), x_dir=(1, 0, 0), z_dir=(0, 1, 0))):
        with Locations(Location((-23.599895153, 35, 0), (0, 0, 270))):
            Circle(SKETCH8_R)
        with Locations(Location((-10.399895153, 35, 0), (0, 0, 270))):
            Circle(SKETCH8_R)
    extrude(amount=-CUT_EXTRUDE4_DEPTH, mode=Mode.SUBTRACT)

    # Fillet8
    fillet8_edges = [part.edges().sort_by_distance(p)[0] for p in [
        (5.500104847, 17.00005562, -2),
        (-39.499895153, 17.00005562, -2),
        (5.500104847, -5.207051161, -2.292893219),
        (-39.499895153, -5.207051161, -2.292893219),
        (5.500104847, 39.207162401, -2.292893219),
        (-39.499895153, 39.207162401, -2.292893219),
        (-39.499895153, -5.49994438, -27.5),
        (-39.499895153, 39.50005562, -35),
        (5.500104847, 39.50005562, -35),
        (5.500104847, -5.49994438, -26.5),
    ]]
    fillet(fillet8_edges, radius=FILLET8_R)

    # Sketch9 → Cut-Extrude5 (cut)
    with BuildSketch(Plane(origin=(0, 39.50005562, 0), x_dir=(1, 0, 0), z_dir=(0, 1, 0))):
        with Locations((-16.999895153, 55)):
            Rectangle(SKETCH9_W, SKETCH9_H)
    extrude(amount=-CUT_EXTRUDE5_DEPTH, mode=Mode.SUBTRACT)

    # Sketch11 → Cut-Extrude6 (cut)
    with BuildSketch(Plane(origin=(0, 39.50005562, 0), x_dir=(1, 0, 0), z_dir=(0, 1, 0))):
        with Locations((-16.999895153, 15)):
            Rectangle(SKETCH11_W, SKETCH11_H)
    extrude(amount=-CUT_EXTRUDE6_DEPTH, mode=Mode.SUBTRACT)

    # Fillet12
    fillet12_edges = [part.edges().sort_by_distance(p)[0] for p in [
        (-1.999895153, 37.25005562, -19),
        (-1.999895153, 37.25005562, -11),
        (-31.999895153, 37.25005562, -11),
        (-31.999895153, 37.25005562, -19),
    ]]
    fillet(fillet12_edges, radius=FILLET12_R)


solid = part.part
